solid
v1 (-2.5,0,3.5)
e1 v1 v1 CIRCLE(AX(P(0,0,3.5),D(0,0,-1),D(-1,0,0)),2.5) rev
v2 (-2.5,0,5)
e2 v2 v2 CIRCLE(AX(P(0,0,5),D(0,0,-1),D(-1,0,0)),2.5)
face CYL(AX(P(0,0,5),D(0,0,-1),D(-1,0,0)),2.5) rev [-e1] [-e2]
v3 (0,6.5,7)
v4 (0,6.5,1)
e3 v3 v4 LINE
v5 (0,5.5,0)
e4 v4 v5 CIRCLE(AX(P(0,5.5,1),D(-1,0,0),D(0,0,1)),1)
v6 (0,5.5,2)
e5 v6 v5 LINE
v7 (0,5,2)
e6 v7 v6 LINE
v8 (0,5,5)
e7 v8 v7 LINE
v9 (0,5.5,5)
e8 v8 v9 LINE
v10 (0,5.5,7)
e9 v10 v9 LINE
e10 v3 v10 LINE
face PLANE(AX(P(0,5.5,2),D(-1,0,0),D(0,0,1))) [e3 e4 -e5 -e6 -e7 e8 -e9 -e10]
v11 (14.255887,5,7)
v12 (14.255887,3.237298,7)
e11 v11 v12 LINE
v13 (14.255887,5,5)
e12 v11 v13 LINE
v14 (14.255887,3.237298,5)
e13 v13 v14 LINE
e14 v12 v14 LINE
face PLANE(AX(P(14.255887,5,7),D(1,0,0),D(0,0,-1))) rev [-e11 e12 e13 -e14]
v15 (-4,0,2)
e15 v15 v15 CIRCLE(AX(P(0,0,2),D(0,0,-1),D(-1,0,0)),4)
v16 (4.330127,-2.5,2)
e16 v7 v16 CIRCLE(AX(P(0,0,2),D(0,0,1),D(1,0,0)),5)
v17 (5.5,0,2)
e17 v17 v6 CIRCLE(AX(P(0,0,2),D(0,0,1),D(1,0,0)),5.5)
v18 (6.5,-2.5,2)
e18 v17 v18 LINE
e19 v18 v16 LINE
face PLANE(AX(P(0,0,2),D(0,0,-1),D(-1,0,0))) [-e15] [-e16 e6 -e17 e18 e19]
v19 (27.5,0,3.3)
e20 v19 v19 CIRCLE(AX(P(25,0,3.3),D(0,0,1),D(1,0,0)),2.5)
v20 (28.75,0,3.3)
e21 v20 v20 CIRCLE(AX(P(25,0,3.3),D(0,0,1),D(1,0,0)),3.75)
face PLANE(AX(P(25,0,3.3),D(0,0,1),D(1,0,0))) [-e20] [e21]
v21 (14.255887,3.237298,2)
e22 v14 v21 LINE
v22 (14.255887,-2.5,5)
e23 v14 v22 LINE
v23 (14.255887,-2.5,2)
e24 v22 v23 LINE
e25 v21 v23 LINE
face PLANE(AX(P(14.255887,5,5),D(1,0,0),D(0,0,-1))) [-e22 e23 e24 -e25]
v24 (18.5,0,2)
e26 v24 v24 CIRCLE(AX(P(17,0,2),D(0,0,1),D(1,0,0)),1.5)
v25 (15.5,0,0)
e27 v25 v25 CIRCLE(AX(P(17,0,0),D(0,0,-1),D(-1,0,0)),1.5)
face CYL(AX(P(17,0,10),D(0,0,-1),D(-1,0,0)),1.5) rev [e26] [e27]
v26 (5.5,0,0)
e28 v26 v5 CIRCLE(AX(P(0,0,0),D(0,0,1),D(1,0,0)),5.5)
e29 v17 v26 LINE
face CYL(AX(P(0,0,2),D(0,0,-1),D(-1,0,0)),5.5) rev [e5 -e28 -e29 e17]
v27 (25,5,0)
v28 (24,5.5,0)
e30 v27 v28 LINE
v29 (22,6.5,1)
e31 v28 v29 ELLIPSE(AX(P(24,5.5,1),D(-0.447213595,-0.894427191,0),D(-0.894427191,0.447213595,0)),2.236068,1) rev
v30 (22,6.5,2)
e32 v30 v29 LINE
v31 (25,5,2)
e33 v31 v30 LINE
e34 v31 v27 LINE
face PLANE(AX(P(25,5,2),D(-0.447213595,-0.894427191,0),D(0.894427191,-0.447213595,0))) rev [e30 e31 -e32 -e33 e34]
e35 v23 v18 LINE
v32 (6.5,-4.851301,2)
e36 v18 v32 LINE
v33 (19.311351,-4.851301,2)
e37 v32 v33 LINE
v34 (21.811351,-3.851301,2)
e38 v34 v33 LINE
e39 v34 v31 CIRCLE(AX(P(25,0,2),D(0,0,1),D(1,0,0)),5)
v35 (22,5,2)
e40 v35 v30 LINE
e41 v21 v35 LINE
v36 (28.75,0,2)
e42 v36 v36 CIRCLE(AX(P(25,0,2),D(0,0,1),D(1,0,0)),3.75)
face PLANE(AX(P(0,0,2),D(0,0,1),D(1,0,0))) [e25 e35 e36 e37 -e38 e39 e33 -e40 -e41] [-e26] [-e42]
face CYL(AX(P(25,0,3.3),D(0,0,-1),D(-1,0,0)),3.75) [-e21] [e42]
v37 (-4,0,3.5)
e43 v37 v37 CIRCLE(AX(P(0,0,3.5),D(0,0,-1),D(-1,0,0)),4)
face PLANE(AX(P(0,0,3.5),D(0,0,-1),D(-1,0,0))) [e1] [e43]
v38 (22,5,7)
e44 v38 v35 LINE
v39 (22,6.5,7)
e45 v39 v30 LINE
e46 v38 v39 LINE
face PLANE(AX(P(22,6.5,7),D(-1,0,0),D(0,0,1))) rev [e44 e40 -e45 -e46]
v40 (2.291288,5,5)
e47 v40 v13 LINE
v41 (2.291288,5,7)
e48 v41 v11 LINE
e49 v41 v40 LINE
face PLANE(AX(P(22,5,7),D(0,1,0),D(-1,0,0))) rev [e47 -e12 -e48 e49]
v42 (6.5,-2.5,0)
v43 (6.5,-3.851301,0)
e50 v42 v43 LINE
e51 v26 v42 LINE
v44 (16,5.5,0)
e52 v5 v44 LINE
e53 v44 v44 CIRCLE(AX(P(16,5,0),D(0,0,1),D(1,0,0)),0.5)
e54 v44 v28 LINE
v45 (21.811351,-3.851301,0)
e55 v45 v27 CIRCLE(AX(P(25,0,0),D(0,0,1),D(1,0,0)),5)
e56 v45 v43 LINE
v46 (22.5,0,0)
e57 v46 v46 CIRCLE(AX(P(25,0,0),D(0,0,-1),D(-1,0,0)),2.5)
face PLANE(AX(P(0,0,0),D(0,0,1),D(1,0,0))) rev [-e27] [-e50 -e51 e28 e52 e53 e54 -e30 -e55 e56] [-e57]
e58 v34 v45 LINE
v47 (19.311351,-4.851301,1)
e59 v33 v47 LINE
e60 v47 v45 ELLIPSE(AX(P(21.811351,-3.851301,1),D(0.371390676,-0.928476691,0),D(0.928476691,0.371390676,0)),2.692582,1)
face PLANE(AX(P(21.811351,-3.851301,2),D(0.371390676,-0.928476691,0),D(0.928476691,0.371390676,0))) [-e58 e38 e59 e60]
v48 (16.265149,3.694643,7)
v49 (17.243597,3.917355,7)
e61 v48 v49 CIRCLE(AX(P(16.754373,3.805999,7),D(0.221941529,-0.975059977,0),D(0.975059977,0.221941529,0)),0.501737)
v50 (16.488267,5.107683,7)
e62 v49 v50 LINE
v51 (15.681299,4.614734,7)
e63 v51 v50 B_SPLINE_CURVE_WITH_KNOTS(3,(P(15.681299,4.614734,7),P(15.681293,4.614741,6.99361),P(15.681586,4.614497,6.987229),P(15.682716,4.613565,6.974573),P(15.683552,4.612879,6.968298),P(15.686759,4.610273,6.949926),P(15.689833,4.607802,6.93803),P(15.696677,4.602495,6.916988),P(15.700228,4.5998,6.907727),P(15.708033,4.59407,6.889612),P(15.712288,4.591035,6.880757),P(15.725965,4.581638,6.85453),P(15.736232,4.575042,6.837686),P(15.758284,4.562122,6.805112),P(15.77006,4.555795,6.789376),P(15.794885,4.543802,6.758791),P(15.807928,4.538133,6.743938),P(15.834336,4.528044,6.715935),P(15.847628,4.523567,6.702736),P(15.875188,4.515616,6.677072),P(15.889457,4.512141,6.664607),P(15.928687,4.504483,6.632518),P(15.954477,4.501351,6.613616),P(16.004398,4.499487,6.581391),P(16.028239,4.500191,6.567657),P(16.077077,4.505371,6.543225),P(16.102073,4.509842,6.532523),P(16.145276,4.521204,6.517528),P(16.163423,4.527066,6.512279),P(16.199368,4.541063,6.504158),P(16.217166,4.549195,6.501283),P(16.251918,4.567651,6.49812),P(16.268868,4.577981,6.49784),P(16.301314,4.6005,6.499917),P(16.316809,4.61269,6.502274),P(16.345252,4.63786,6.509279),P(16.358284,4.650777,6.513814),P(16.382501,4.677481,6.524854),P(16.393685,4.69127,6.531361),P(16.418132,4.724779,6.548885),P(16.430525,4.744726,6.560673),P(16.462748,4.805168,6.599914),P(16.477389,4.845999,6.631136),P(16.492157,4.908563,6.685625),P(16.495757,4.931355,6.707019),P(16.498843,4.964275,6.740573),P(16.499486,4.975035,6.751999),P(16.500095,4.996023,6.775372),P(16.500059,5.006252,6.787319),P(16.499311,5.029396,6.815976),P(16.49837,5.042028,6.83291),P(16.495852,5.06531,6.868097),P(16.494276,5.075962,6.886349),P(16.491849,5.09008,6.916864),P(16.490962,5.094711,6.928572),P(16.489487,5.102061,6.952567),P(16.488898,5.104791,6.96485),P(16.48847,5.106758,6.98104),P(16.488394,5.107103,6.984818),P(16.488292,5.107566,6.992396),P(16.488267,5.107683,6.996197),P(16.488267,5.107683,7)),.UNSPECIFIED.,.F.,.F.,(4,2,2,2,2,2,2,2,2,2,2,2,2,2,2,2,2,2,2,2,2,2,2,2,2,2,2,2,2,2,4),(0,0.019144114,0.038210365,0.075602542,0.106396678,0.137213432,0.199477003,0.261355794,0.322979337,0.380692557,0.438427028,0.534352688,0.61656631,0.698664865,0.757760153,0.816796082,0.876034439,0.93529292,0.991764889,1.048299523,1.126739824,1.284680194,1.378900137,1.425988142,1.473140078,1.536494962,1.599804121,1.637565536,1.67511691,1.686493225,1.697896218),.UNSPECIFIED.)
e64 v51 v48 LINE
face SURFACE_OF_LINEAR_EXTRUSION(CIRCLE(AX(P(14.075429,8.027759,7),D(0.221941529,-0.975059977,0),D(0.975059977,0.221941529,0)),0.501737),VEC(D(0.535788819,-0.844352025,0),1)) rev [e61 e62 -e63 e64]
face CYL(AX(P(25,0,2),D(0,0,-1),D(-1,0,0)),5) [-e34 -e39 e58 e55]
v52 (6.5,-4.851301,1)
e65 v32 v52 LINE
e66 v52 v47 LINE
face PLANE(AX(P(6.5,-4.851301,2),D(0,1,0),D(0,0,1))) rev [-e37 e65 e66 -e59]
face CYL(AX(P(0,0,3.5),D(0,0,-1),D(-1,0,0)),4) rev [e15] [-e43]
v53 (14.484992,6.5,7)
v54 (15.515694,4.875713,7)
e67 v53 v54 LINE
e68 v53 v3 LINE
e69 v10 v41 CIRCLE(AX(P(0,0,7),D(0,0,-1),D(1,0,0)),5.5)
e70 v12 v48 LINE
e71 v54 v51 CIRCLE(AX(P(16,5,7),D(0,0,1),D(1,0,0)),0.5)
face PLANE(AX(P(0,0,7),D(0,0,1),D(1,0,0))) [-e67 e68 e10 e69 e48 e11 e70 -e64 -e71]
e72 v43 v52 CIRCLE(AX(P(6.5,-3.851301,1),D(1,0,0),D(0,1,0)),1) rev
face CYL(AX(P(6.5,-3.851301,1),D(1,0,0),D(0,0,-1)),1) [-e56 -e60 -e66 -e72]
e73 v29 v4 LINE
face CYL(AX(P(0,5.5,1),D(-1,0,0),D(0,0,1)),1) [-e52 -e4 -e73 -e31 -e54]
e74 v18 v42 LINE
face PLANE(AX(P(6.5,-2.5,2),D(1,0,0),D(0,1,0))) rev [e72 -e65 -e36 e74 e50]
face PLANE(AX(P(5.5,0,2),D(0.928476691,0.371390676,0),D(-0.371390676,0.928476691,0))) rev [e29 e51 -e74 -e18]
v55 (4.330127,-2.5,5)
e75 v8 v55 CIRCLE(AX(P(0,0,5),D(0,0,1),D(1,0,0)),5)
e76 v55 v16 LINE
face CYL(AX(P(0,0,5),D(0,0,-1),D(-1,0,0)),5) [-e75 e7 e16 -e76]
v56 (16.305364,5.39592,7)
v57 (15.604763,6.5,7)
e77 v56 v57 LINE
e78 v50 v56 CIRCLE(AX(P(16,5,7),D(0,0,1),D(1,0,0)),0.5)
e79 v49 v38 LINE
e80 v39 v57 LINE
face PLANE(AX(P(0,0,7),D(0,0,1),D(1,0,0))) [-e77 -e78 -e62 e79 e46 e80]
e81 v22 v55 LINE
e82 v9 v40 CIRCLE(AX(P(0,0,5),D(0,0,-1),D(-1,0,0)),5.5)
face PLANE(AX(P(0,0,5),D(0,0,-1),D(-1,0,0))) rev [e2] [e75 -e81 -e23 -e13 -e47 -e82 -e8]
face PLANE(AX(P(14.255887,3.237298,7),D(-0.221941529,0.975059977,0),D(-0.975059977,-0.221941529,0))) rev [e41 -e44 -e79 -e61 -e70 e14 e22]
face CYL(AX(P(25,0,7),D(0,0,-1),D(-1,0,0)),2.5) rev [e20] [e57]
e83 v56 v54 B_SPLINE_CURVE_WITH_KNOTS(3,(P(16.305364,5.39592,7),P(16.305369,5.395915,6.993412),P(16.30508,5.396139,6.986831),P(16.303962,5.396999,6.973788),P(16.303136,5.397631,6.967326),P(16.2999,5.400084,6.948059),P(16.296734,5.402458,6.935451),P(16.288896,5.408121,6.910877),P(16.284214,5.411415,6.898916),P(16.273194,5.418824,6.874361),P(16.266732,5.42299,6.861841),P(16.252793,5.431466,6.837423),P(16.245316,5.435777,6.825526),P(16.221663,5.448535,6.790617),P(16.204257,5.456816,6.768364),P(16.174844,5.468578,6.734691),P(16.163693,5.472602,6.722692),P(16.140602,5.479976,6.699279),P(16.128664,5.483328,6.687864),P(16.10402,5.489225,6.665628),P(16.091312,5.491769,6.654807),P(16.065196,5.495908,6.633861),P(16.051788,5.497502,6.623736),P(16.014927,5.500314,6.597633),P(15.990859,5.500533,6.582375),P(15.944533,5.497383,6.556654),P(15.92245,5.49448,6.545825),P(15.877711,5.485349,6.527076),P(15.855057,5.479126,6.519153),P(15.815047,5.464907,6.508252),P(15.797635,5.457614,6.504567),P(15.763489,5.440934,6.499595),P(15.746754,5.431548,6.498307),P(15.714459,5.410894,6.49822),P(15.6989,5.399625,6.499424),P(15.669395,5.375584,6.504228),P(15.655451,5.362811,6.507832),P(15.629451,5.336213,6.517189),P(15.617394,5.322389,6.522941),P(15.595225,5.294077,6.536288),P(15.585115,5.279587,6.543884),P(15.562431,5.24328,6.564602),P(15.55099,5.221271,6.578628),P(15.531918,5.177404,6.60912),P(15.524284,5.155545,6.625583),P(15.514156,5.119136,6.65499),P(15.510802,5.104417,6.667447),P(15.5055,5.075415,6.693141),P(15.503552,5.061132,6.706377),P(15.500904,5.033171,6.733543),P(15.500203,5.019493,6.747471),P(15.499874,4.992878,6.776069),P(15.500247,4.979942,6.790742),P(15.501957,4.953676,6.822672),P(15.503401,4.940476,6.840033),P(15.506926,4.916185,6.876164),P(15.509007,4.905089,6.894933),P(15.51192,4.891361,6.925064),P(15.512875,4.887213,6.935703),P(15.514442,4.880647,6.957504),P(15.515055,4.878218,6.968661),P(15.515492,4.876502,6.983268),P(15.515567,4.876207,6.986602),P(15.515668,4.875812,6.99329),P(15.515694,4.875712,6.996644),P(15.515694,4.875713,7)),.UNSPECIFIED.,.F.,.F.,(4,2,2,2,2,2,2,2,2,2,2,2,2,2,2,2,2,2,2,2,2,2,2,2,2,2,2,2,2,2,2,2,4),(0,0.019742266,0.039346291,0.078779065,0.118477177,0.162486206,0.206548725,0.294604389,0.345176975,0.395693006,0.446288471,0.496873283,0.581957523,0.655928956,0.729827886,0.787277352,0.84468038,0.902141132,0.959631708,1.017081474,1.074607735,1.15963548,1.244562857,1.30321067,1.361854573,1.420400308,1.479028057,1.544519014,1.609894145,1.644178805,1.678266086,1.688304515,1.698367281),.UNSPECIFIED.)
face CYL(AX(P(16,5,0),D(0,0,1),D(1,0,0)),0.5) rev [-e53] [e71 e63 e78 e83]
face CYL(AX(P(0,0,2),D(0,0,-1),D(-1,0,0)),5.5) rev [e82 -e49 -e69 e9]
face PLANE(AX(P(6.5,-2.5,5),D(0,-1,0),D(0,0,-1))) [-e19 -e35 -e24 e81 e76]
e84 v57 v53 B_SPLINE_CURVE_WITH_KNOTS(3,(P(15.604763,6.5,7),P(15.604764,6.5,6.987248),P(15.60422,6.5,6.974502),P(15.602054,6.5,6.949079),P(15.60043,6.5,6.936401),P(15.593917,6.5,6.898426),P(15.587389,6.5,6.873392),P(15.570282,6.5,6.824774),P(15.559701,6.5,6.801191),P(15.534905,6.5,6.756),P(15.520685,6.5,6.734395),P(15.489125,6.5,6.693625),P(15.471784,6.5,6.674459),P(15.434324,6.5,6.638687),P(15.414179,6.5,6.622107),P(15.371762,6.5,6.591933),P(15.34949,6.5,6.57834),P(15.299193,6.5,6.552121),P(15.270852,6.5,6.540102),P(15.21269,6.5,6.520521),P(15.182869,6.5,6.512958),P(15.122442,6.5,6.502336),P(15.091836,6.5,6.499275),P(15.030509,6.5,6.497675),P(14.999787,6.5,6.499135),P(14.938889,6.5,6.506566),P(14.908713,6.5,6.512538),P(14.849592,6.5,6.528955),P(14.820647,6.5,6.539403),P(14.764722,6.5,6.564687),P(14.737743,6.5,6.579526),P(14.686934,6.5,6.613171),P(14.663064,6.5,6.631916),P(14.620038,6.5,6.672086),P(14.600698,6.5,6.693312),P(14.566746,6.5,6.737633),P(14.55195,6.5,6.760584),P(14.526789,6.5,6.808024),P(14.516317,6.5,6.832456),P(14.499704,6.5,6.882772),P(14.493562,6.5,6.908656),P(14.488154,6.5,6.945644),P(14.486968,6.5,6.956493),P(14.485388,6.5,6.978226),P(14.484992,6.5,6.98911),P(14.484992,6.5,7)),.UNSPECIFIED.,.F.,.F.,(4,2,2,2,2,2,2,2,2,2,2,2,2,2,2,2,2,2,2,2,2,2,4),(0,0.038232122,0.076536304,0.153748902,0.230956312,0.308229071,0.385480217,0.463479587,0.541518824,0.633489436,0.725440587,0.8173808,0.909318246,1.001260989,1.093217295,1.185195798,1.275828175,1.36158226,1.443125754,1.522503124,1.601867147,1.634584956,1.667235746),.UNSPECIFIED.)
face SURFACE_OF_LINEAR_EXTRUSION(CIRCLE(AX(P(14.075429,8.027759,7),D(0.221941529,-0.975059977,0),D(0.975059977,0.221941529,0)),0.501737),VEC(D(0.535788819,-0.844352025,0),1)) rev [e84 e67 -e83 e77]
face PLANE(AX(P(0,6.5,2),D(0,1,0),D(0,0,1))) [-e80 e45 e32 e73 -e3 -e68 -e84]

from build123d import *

# Parameters (mm, degrees)
BOSS_EXTRUDE1_DEPTH = 2
BOSS_EXTRUDE2_DEPTH = 5
BOSS_EXTRUDE3_DEPTH = 3
SKETCH7_R           = 2.5
CUT_EXTRUDE1_DEPTH  = 3
SKETCH8_R           = 4
CUT_EXTRUDE2_DEPTH  = 1.5
SKETCH12_R          = 3.75
BOSS_EXTRUDE5_DEPTH = 1.3
SKETCH13_R          = 2.5
CUT_EXTRUDE4_DEPTH  = 32.484122983
FILLET2_R           = 1
SKETCH14_R          = 1.5
CUT_EXTRUDE5_DEPTH  = 10
BOSS_EXTRUDE6_DEPTH = 5
SKETCH17_R          = 0.5
CUT_EXTRUDE6_DEPTH  = 32.484122983
SKETCH19_R          = 0.501737203
CUT_EXTRUDE7_DEPTH  = 5


with BuildPart() as part:
    # Sketch3 → Boss-Extrude1 (new body)
    with BuildSketch(Plane.XY):
        with BuildLine():
            Line((0, 5.5), (0, 6.5))
            Line((0, 6.5), (22, 6.5))
            Line((22, 6.5), (25, 5))
            ThreePointArc((25, 5), (29.704067696, -1.694623001), (21.811351474, -3.851301154))
            Line((21.811351474, -3.851301154), (19.311351474, -4.851301154))
            Line((19.311351474, -4.851301154), (6.5, -4.851301154))
            Line((6.5, -4.851301154), (6.5, -2.5))
            Line((6.5, -2.5), (5.5, 0))
            ThreePointArc((5.5, 0), (3.889087297, 3.889087297), (0, 5.5))
        make_face()
    extrude(amount=BOSS_EXTRUDE1_DEPTH)

    # Sketch4 → Boss-Extrude2 (add)
    with BuildSketch(Plane.XY.offset(2)):
        with BuildLine():
            Line((0, 6.5), (22, 6.5))
            Line((22, 6.5), (22, 5))
            Line((22, 5), (2.291287847, 5))
            ThreePointArc((2.291287847, 5), (1.17260394, 5.373546315), (0, 5.5))
            Line((0, 5.5), (0, 6.5))
        make_face()
    extrude(amount=BOSS_EXTRUDE2_DEPTH)

    # Sketch6 → Boss-Extrude3 (add)
    with BuildSketch(Plane.XY.offset(2)):
        with BuildLine():
            Line((2.291287847, 5), (12.145643924, 5))
            Line((12.145643924, 5), (14.255887023, 5))
            Line((14.255887023, 5), (14.255887023, -2.5))
            Line((14.255887023, -2.5), (12.145643924, -2.5))
            Line((12.145643924, -2.5), (6.5, -2.5))
            Line((6.5, -2.5), (4.330127019, -2.5))
            ThreePointArc((4.330127019, -2.5), (-4.330127019, -2.5), (0, 5))
            Line((0, 5), (0, 5.5))
            ThreePointArc((0, 5.5), (1.17260394, 5.373546315), (2.291287847, 5))
        make_face()
    extrude(amount=BOSS_EXTRUDE3_DEPTH)

    # Sketch7 → Cut-Extrude1 (cut)
    with BuildSketch(Plane(origin=(0, 0, 2), x_dir=(-1, 0, 0), z_dir=(0, 0, -1))):
        Circle(SKETCH7_R)
    extrude(amount=-CUT_EXTRUDE1_DEPTH, mode=Mode.SUBTRACT)

    # Sketch8 → Cut-Extrude2 (cut)
    with BuildSketch(Plane(origin=(0, 0, 2), x_dir=(-1, 0, 0), z_dir=(0, 0, -1))):
        Circle(SKETCH8_R)
    extrude(amount=-CUT_EXTRUDE2_DEPTH, mode=Mode.SUBTRACT)

    # Sketch12 → Boss-Extrude5 (add)
    with BuildSketch(Plane.XY.offset(2)):
        with Locations((25, 0)):
            Circle(SKETCH12_R)
    extrude(amount=BOSS_EXTRUDE5_DEPTH)

    # Sketch13 → Cut-Extrude4 (cut, through all)
    with BuildSketch(Plane(origin=(0, 0, 0), x_dir=(-1, 0, 0), z_dir=(0, 0, -1))):
        with Locations((-25, 0)):
            Circle(SKETCH13_R)
    extrude(amount=-CUT_EXTRUDE4_DEPTH, mode=Mode.SUBTRACT)

    # Fillet2
    fillet2_edges = [part.edges().sort_by_distance(p)[0] for p in [
        (12.905675737, -4.851301154, 0),
        (11, 6.5, 0),
    ]]
    fillet(fillet2_edges, radius=FILLET2_R - 0.0001)  # a hair under: the kernel refuses the full size

    # Sketch14 → Cut-Extrude5 (cut)
    with BuildSketch(Plane(origin=(0, 0, 0), x_dir=(-1, 0, 0), z_dir=(0, 0, -1))):
        with Locations((-17, 0)):
            Circle(SKETCH14_R)
    extrude(amount=-CUT_EXTRUDE5_DEPTH, mode=Mode.SUBTRACT)

    # Sketch16 → Boss-Extrude6 (add)
    with BuildSketch(Plane.XY.offset(2)):
        Polygon((14.255887023, 5), (14.255887023, 3.237297895), (22, 5), align=None)
    extrude(amount=BOSS_EXTRUDE6_DEPTH)

    # Sketch17 → Cut-Extrude6 (cut, through all)
    with BuildSketch(Plane.XY.offset(7)):
        with Locations((16, 5)):
            Circle(SKETCH17_R)
    extrude(amount=-CUT_EXTRUDE6_DEPTH, mode=Mode.SUBTRACT)

    # Sketch19 → Cut-Extrude7 (cut, along a direction that is not the sketch's normal)
    with BuildSketch(Plane(origin=(0.001645419, -0.007228852, 0), x_dir=(0.9750599765095712, 0.2219415288069236, 0), z_dir=(0.2219415288069236, -0.9750599765095712, 0))):
        with Locations((17.181227497, 7)):
            Circle(SKETCH19_R)
    extrude(amount=-CUT_EXTRUDE7_DEPTH, dir=(0.5357888185412162, -0.8443520248842943, 0), mode=Mode.SUBTRACT)


solid = part.part
